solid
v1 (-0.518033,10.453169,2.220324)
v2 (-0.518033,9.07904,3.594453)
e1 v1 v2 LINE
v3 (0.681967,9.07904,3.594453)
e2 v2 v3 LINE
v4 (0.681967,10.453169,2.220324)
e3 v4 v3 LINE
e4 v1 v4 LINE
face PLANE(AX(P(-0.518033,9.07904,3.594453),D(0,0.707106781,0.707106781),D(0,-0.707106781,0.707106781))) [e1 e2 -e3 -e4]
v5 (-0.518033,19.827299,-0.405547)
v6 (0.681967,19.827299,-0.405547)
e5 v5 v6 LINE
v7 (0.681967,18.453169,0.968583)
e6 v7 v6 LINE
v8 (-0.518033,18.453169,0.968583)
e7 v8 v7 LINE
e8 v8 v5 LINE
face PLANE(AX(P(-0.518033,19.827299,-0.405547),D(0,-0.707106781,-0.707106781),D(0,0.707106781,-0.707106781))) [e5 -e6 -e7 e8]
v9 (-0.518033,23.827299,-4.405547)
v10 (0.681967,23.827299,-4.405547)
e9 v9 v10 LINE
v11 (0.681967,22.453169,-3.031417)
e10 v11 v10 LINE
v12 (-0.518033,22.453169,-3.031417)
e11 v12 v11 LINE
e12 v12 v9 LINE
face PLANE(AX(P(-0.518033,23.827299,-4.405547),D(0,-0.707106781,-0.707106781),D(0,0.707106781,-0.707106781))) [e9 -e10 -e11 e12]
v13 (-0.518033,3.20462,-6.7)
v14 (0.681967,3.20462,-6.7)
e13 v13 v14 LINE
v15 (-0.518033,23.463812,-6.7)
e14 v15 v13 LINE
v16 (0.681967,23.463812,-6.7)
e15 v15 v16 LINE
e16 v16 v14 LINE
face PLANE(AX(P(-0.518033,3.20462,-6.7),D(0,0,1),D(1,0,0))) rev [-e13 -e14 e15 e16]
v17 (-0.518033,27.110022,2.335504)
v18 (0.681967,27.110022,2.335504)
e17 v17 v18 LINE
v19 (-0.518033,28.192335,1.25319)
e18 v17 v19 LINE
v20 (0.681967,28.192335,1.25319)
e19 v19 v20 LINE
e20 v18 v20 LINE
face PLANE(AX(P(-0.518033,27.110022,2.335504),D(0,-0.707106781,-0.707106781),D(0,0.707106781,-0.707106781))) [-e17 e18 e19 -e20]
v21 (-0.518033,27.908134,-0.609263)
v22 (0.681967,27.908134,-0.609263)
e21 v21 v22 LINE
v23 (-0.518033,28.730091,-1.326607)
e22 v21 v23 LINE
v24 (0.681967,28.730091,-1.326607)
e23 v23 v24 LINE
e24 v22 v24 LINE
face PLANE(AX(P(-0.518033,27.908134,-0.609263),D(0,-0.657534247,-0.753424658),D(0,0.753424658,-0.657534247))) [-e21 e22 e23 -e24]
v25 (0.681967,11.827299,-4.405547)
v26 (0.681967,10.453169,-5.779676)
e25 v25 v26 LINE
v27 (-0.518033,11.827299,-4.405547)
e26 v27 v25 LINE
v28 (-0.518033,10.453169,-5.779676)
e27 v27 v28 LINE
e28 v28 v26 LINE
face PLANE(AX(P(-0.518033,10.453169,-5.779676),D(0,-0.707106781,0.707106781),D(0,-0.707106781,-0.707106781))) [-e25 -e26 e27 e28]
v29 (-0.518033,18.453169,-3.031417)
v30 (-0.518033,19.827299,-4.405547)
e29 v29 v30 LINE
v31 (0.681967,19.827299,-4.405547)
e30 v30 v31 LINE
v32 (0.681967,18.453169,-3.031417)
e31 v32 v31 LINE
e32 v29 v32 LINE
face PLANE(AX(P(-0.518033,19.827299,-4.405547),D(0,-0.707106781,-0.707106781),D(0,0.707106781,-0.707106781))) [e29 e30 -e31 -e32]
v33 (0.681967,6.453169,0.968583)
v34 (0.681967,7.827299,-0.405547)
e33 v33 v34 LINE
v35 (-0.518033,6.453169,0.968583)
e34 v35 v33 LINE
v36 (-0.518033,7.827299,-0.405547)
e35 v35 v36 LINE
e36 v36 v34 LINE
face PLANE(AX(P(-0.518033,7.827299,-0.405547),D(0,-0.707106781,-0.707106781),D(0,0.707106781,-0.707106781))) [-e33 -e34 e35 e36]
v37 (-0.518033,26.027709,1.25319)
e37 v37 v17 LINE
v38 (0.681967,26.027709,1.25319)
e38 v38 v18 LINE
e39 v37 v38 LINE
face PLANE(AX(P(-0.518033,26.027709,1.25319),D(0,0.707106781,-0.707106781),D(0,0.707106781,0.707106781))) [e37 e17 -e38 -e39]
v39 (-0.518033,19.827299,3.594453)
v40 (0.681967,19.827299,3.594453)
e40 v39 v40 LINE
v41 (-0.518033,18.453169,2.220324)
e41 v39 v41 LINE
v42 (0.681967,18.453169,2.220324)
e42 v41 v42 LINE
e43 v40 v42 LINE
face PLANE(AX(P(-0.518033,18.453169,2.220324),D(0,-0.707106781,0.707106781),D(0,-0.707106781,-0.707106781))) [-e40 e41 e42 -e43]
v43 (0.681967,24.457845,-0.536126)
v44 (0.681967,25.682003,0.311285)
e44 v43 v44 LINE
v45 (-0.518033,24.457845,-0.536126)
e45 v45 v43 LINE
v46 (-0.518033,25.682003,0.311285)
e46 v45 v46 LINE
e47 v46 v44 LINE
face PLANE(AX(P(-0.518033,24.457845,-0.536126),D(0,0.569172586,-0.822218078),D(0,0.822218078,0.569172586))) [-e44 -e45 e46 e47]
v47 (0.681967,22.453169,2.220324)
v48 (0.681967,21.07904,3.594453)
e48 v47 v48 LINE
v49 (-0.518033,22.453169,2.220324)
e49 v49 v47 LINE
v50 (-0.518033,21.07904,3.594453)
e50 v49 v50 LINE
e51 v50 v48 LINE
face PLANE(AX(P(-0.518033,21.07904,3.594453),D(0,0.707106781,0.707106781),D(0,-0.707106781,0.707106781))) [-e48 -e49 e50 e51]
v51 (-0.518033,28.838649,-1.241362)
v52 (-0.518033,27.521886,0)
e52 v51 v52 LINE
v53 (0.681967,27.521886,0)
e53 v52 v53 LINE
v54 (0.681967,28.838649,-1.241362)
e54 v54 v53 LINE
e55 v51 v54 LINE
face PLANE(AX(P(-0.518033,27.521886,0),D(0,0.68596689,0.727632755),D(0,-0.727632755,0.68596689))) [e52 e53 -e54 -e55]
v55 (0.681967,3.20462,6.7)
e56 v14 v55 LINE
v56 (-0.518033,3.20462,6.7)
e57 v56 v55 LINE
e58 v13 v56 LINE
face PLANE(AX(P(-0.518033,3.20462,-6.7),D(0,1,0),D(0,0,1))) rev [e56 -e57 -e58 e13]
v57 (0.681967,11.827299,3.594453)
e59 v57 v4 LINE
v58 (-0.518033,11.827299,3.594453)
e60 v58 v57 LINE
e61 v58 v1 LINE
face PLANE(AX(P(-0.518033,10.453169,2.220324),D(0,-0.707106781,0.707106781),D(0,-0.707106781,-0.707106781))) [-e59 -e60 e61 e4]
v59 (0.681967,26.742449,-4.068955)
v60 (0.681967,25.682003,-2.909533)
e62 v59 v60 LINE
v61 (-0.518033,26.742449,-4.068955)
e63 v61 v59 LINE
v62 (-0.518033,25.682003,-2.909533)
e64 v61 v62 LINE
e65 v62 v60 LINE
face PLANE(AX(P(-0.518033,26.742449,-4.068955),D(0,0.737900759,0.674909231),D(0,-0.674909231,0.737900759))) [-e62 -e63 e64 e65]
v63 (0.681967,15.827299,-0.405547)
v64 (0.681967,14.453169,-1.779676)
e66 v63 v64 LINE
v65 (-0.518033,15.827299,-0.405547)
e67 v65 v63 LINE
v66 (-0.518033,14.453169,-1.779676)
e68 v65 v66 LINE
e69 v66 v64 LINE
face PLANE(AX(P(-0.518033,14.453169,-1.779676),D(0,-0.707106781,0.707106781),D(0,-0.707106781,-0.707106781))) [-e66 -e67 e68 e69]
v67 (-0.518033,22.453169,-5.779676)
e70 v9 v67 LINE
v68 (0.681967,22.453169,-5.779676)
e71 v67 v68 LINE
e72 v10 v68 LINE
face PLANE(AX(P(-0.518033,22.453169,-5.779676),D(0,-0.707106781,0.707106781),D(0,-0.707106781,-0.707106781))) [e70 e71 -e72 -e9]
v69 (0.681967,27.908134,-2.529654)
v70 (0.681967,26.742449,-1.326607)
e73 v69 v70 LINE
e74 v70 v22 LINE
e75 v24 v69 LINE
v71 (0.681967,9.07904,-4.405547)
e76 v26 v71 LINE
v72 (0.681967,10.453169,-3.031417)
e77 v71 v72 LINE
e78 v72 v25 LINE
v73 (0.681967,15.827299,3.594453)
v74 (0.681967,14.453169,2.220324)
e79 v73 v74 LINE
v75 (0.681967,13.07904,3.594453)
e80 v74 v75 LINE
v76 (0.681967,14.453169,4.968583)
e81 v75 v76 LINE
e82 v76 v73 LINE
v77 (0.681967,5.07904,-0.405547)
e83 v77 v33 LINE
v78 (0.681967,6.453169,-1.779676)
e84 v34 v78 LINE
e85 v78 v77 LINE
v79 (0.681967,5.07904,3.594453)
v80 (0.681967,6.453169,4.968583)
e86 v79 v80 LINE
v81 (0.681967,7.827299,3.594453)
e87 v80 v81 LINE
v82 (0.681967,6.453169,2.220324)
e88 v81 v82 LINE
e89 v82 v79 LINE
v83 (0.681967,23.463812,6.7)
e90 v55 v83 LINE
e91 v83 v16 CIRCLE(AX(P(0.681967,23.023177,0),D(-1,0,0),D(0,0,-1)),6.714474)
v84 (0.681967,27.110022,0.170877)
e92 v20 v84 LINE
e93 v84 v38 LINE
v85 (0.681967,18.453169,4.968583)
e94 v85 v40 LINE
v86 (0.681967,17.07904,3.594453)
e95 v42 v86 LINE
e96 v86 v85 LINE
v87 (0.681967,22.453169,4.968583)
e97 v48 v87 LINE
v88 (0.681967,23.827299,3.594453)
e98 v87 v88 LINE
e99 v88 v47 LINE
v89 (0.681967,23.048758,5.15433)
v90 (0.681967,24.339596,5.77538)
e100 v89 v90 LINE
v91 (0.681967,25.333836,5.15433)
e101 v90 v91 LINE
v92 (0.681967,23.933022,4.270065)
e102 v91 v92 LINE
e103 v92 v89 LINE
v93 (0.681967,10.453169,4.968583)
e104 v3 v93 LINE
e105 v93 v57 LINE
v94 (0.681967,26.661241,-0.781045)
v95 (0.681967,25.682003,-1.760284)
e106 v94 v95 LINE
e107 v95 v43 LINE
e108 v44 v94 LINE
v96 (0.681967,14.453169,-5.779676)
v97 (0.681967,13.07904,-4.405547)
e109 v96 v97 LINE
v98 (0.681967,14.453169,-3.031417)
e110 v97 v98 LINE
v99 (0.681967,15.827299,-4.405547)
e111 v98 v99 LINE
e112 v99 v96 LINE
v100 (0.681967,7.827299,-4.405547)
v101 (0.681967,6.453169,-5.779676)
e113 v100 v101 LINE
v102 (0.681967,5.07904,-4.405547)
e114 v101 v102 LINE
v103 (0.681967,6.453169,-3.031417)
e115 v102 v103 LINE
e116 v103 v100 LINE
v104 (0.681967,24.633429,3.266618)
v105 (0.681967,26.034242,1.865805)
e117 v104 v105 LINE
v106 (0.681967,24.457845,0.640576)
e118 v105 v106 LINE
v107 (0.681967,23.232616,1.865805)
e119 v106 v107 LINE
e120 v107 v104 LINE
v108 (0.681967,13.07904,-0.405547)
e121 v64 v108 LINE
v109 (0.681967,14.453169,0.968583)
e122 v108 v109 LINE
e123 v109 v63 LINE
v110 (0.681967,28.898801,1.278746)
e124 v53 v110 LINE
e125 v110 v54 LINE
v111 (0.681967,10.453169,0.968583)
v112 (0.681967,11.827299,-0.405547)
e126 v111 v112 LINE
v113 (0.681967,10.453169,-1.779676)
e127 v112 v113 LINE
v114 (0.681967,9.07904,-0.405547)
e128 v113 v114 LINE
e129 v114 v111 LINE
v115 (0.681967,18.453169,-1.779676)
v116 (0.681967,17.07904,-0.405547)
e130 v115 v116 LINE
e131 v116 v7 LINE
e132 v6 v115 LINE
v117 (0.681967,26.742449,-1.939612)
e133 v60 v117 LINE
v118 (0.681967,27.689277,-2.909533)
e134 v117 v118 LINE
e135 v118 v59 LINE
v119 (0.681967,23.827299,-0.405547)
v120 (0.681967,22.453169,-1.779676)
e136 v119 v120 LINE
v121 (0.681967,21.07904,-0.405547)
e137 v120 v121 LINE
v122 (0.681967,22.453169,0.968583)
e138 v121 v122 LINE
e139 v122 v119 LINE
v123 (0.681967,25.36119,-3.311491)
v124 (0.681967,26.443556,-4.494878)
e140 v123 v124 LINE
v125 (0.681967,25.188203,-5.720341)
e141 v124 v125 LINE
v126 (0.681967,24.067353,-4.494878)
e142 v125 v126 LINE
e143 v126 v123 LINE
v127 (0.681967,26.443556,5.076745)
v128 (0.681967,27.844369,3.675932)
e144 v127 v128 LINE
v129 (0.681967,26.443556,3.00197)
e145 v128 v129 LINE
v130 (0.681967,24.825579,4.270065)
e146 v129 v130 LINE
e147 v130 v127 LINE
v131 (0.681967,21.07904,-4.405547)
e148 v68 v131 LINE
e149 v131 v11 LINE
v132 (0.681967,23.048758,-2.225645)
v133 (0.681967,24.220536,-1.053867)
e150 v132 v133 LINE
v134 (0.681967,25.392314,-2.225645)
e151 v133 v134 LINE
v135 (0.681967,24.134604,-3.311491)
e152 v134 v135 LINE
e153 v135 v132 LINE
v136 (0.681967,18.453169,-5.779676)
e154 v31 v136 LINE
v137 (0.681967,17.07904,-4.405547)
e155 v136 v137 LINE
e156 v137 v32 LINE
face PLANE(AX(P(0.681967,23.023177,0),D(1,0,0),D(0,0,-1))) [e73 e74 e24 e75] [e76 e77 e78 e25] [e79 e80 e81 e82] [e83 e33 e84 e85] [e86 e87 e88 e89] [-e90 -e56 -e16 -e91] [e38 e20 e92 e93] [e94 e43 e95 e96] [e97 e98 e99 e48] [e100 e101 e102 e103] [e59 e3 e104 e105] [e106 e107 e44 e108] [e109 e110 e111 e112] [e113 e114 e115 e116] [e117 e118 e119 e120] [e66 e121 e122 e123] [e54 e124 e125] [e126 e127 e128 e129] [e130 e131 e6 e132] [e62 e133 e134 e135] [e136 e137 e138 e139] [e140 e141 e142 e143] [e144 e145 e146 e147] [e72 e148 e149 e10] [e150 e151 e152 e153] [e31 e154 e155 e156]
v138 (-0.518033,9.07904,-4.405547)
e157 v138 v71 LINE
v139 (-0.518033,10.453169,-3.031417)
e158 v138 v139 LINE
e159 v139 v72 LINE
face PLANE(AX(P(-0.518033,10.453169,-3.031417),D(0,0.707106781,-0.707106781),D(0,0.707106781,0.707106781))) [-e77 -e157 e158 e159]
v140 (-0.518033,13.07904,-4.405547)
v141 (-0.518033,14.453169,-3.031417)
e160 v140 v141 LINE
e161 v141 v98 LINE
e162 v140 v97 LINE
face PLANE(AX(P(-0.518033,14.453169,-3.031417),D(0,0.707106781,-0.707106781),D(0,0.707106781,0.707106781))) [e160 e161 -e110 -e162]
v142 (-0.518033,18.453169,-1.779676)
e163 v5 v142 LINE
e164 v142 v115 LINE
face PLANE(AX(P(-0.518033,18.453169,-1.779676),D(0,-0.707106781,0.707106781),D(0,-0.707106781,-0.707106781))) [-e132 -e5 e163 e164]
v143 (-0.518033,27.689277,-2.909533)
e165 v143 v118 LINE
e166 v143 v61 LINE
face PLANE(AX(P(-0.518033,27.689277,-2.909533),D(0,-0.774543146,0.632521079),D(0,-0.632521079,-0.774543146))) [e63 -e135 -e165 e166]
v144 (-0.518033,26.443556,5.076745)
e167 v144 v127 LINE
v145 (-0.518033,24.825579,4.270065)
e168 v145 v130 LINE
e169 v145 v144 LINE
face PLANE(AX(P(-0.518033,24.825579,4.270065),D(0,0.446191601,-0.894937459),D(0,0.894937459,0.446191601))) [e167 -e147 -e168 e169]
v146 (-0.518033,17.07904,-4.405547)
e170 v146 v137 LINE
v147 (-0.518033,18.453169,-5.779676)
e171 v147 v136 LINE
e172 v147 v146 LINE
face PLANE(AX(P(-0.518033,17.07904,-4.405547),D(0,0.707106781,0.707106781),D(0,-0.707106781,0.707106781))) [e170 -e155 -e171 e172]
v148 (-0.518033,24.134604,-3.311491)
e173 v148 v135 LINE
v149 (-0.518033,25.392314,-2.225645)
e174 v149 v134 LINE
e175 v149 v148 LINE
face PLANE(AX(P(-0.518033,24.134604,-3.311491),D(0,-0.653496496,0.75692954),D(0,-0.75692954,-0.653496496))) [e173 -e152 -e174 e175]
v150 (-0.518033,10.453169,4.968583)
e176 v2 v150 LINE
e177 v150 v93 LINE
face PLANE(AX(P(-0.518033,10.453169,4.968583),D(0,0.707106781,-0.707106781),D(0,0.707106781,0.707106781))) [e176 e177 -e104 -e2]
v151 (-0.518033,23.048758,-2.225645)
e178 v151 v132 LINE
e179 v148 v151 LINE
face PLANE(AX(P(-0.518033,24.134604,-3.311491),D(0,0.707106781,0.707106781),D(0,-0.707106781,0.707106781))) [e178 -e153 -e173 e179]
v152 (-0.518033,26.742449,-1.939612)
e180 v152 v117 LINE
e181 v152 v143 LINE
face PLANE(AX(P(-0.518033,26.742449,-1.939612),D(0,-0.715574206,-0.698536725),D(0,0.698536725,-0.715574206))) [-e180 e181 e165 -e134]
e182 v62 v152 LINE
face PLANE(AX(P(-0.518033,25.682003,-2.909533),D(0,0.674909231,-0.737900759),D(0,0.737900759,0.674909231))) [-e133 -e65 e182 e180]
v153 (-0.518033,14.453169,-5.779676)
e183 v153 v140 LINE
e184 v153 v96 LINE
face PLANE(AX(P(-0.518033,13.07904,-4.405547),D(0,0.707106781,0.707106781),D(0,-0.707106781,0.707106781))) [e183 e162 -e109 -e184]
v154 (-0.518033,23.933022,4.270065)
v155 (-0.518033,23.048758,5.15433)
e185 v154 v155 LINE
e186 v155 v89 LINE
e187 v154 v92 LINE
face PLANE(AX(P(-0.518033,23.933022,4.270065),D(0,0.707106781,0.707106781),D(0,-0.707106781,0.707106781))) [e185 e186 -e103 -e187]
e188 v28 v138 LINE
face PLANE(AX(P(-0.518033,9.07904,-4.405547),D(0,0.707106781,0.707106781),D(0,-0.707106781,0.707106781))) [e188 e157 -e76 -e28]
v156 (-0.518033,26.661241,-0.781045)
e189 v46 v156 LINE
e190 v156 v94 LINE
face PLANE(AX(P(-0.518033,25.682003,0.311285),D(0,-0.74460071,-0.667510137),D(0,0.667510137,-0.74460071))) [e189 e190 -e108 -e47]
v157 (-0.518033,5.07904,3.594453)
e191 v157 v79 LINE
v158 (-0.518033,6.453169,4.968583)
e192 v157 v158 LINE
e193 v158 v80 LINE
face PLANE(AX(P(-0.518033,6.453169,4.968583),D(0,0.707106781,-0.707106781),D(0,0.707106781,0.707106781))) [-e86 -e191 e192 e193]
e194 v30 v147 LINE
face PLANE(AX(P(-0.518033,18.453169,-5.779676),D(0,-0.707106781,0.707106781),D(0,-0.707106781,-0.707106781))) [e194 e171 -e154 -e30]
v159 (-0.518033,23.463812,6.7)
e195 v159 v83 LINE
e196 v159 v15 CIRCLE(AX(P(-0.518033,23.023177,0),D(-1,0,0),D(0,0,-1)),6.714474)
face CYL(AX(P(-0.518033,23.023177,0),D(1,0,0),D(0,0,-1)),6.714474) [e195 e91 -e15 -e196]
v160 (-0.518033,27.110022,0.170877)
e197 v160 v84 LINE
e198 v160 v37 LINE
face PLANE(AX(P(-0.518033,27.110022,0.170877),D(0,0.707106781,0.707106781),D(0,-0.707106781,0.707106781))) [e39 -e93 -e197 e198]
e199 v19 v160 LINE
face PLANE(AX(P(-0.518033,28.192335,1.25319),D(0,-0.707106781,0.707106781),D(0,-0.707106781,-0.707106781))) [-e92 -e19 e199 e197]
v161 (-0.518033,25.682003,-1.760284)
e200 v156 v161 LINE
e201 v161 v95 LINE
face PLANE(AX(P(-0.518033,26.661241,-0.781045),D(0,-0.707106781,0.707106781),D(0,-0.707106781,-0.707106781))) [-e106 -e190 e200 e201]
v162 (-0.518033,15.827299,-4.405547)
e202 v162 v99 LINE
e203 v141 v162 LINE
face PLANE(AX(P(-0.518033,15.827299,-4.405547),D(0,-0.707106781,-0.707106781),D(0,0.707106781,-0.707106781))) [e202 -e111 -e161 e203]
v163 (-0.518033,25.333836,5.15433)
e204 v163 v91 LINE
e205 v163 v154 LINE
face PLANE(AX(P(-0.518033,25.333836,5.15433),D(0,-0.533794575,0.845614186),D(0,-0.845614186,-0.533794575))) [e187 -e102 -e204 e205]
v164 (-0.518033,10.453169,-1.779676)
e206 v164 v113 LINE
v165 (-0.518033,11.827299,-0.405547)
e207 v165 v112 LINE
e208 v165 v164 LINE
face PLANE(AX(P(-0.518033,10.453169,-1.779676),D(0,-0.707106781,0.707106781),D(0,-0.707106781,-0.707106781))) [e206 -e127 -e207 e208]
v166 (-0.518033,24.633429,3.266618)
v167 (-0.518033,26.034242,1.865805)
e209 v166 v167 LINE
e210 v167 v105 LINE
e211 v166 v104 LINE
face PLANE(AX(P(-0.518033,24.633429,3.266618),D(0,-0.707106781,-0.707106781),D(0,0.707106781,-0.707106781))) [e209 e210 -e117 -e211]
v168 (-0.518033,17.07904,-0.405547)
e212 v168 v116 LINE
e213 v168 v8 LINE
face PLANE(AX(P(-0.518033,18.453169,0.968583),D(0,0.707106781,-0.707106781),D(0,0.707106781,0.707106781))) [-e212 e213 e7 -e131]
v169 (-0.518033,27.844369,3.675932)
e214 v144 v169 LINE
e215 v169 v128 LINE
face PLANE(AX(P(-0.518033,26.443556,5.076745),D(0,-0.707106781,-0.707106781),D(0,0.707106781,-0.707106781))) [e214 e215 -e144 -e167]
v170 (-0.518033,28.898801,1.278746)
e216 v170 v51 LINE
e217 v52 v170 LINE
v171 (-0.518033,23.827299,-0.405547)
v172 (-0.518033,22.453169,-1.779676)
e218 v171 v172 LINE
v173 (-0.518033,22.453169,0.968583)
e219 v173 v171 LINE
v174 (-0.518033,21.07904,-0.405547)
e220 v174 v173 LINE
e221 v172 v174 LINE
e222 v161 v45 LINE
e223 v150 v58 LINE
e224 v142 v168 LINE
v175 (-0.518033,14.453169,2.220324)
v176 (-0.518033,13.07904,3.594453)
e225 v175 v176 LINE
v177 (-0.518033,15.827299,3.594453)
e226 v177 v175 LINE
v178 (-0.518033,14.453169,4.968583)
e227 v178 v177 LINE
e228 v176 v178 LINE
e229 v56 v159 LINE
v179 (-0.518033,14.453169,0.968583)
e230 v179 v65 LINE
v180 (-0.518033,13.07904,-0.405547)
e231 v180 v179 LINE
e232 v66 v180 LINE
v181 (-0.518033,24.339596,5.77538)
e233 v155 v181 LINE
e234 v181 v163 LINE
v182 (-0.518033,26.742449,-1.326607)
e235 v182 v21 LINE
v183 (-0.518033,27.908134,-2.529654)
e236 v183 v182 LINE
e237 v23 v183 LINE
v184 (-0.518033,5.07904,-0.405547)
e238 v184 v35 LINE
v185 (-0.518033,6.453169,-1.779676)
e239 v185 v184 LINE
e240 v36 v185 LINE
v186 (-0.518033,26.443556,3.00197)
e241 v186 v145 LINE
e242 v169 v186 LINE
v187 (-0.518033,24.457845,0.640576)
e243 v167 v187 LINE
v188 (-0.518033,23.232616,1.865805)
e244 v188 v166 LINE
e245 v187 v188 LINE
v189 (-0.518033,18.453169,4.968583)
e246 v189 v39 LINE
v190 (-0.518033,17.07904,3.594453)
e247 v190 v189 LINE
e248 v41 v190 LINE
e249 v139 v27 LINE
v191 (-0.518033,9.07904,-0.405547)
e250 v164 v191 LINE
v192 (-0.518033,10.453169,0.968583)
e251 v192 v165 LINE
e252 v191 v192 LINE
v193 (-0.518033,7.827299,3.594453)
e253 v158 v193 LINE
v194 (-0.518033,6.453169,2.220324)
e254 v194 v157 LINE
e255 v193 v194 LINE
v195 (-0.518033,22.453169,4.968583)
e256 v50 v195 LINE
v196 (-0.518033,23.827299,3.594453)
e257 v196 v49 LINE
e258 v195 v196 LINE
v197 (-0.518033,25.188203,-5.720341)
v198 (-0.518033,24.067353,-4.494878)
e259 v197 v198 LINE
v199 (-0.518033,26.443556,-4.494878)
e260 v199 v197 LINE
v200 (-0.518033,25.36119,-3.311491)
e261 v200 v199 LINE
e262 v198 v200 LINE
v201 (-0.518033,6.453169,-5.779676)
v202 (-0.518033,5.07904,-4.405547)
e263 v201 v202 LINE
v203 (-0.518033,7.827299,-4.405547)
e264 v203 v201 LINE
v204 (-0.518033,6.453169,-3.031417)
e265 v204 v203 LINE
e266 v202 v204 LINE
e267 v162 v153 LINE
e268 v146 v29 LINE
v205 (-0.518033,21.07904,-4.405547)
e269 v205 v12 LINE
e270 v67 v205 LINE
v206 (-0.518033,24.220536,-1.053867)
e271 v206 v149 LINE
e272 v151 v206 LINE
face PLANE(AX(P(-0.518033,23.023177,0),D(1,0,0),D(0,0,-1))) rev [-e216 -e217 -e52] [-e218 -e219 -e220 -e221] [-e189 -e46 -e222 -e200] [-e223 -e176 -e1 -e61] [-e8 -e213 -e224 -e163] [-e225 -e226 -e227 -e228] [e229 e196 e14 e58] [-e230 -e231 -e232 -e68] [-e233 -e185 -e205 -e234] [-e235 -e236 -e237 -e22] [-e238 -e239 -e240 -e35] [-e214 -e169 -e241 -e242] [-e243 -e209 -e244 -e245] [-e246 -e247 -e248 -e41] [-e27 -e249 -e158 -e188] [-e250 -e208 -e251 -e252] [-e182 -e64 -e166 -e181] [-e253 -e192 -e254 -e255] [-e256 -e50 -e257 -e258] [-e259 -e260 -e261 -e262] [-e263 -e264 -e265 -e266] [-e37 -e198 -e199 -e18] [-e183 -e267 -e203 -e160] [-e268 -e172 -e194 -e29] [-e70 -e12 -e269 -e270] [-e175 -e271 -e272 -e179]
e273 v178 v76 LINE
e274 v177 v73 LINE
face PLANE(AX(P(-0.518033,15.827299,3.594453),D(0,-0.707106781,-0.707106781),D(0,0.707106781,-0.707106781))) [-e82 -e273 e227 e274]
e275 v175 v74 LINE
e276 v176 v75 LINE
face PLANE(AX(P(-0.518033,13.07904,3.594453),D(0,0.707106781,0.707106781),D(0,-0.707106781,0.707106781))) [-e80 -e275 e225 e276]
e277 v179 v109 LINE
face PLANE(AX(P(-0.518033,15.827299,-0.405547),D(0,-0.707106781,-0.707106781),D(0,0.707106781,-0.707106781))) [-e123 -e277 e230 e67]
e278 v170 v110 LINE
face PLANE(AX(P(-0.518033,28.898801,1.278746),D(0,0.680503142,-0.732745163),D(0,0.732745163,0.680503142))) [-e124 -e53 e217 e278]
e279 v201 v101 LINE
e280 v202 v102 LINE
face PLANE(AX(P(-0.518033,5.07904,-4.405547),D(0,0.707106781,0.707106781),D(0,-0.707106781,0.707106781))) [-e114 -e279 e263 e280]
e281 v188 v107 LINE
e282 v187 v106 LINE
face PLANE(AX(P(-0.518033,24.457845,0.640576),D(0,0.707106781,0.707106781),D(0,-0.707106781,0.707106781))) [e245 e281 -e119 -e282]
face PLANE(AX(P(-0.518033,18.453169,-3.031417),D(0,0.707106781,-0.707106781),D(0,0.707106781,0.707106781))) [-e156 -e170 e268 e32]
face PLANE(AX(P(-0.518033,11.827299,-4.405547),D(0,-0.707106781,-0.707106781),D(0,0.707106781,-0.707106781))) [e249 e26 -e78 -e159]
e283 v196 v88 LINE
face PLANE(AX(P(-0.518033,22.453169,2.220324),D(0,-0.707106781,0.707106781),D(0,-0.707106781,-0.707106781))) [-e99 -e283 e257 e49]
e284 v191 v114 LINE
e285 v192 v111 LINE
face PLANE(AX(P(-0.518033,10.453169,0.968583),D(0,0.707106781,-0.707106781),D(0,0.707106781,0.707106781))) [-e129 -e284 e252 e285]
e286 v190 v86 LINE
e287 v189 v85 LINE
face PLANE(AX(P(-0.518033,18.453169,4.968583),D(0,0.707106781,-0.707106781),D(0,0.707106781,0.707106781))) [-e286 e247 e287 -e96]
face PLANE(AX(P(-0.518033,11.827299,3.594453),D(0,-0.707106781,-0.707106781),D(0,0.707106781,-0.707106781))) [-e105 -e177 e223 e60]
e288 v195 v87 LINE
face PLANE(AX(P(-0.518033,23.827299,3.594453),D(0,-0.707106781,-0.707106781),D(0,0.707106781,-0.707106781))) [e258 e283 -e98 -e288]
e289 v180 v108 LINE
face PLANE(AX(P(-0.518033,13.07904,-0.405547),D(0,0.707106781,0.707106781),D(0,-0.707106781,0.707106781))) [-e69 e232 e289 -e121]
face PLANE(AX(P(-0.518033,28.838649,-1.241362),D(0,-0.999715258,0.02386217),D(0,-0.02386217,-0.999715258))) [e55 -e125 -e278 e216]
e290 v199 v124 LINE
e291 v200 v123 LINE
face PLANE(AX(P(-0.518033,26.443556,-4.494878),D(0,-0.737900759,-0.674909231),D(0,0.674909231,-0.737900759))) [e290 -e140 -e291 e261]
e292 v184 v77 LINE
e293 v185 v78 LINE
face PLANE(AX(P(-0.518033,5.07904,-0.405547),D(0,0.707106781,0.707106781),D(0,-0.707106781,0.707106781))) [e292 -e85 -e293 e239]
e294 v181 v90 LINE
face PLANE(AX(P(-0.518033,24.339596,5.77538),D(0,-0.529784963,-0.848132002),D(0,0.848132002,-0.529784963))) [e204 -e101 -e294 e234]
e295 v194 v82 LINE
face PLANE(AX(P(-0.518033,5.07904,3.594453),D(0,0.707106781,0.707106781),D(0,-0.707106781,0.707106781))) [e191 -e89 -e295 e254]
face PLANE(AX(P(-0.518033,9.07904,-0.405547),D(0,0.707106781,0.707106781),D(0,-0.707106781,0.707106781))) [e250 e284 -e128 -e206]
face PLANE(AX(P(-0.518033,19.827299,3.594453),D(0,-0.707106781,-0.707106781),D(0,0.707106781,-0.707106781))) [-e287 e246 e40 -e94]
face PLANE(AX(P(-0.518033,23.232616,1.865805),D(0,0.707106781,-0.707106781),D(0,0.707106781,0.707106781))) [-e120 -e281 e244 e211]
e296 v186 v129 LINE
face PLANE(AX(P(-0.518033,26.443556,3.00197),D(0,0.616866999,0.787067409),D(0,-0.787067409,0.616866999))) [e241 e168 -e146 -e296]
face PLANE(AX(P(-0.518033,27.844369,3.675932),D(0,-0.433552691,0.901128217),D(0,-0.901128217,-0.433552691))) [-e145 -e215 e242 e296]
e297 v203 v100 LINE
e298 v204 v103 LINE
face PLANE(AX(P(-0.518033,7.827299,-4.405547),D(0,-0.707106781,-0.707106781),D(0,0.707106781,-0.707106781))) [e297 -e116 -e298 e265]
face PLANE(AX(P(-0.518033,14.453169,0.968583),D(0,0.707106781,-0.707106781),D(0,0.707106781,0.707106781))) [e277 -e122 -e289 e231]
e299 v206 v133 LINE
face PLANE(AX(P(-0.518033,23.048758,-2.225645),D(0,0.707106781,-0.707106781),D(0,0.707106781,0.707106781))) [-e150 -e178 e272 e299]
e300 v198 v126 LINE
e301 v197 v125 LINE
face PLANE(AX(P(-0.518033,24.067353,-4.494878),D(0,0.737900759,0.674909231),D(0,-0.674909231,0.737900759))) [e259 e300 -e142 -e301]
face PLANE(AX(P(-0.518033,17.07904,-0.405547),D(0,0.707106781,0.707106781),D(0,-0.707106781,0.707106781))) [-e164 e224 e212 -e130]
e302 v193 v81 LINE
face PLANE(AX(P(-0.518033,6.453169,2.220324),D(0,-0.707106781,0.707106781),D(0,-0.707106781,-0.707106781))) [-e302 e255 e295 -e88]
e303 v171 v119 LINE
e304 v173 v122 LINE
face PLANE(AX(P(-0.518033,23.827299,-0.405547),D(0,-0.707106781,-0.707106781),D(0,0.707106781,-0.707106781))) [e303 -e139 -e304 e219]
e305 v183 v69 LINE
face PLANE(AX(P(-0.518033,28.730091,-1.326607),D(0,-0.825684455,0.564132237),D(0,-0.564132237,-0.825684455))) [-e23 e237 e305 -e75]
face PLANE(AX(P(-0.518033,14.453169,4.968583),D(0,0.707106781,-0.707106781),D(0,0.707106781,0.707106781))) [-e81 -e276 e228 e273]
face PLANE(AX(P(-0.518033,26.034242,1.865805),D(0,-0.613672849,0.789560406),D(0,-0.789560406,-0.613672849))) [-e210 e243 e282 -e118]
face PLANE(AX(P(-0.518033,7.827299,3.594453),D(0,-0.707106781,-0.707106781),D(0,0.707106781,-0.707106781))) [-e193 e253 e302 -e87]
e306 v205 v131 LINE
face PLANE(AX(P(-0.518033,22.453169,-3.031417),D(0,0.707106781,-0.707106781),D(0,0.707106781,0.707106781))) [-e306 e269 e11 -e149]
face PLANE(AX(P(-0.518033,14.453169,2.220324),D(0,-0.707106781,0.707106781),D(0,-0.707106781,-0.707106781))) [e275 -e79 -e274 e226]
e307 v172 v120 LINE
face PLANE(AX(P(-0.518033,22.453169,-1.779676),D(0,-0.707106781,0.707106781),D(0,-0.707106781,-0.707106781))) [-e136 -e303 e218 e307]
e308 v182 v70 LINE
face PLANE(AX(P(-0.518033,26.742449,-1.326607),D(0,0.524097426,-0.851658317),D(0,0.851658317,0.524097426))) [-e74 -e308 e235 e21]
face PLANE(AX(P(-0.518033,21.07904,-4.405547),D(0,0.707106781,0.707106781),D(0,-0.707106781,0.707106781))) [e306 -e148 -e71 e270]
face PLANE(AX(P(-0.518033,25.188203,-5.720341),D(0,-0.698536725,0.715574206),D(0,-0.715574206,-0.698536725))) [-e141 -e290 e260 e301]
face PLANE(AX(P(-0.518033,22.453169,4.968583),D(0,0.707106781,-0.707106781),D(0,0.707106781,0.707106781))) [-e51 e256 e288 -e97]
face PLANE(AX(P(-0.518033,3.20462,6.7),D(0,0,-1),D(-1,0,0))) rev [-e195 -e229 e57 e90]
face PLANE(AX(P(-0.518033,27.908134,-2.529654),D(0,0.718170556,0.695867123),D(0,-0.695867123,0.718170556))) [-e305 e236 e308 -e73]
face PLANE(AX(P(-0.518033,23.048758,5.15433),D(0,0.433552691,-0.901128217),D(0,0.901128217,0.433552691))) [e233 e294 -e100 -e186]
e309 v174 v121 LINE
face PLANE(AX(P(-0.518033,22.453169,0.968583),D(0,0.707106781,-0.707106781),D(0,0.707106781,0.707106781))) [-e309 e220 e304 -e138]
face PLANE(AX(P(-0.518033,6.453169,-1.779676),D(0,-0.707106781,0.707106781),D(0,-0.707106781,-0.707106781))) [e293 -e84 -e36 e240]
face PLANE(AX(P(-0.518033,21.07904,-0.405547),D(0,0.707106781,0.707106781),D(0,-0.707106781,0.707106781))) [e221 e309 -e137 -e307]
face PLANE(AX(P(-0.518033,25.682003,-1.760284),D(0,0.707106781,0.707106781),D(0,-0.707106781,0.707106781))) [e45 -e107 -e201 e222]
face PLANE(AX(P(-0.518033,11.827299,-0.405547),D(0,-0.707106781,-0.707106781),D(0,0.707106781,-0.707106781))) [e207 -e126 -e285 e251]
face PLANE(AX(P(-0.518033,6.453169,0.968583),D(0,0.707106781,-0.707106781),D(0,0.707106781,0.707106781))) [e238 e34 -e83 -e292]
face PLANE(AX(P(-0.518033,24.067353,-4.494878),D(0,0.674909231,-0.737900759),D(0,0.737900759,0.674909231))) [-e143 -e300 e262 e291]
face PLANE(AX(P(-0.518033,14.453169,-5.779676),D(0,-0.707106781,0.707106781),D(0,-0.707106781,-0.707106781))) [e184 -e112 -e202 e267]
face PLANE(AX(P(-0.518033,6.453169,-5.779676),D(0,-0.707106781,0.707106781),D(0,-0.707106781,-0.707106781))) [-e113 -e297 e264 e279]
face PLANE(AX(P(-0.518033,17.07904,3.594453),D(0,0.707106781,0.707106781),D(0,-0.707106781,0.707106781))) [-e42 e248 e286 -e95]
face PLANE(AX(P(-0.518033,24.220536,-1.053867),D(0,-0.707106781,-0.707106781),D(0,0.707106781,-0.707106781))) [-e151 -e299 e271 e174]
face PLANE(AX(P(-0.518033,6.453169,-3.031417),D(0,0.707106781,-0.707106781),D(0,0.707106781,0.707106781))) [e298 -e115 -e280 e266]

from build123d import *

# Parameters (mm, degrees)
MAINBASESKETCH_W                 = 7.9
MAINBASESKETCH_H                 = 3.2
MAINBASEEXTRUDE_DEPTH            = 7.9
MAINBASESHELL_T                  = -1.2
SLIMYELLOWUNDEREXT_START         = -0.2
SLIMYELLOWUNDEREXT_DEPTH         = 2
SLIMYELLLOWUPPERCIRCLESKETCH_R   = 2.45
SLIMYELLLOWUPPERCIRCLESKETCH_R_2 = 2
SLIMYELLOWUPPERCIRCLE_DEPTH      = 1.6
MOVE_START                       = 3.2
MOVE_FACE2_OUTLINE_W             = 7.9
MOVE_FACE2_OUTLINE_H             = 15.8
MOVE_FACE2_OUTLINE_R             = 2
MOVE_FACE2_DEPTH                 = 27.8
MOVE_START_2                     = 31
MOVE_FACE2_2_OUTLINE_R           = 2.45
MOVE_FACE2_2_OUTLINE_R_2         = 2
MOVE_FACE2_2_DEPTH               = 1.6
FILLET25_R                       = 7.6
FILLET26_R                       = 7.6
CUT_EXTRUDE55_DEPTH              = 35.461282763
CUT_EXTRUDE57_REACH              = 34.748
SKETCH160_R                      = 0.75
BOSS_EXTRUDE20_DEPTH             = 3.5
BOSS_EXTRUDE22_DEPTH             = 1.2
CUT_EXTRUDE58_DEPTH              = 35.461282763
CUT_EXTRUDE59_DEPTH              = 31.506685799
CUT_EXTRUDE61_DEPTH              = 31.506685799
LPATTERN5_COUNT                  = 5
LPATTERN5_PITCH                  = 4
LPATTERN5_COUNT_DIR2             = 3
LPATTERN5_PITCH_DIR2             = 4
CUT_EXTRUDE62_DEPTH              = 31.506685799


# Read off the part's stored shape, not the designer's step: Move Face2
with BuildPart() as part:
    # MainBaseSketch → MainBaseExtrude (new, symmetric)
    with BuildSketch(Plane.XY):
        with Locations((4.631967213, 1.6)):
            Rectangle(MAINBASESKETCH_W, MAINBASESKETCH_H)
    extrude(amount=MAINBASEEXTRUDE_DEPTH, both=True)

    # MainBaseShell
    mainbaseshell_openings = [part.faces().sort_by_distance(p)[0] for p in [
        (4.631967213, 0, 0),
    ]]
    offset(amount=MAINBASESHELL_T, openings=mainbaseshell_openings, kind=Kind.INTERSECTION)

    # SlimYellowUnderExtSketch → SlimYellowUnderExt (add)
    with BuildSketch(Plane.XZ.offset(-2).offset(SLIMYELLOWUNDEREXT_START)):
        Polygon((1.881967213, 1.952811318), (1.881967213, 2.947188682), (2.384104441, 2.947188682), (2.882626102, 2.45), (2.384104441, 1.952811318), align=None)
        Polygon((6.381308324, 2.45), (6.879829986, 2.947188682), (7.381967213, 2.947188682), (7.381967213, 1.952811318), (6.879829986, 1.952811318), align=None)
        Polygon((1.881967213, -1.952811318), (2.384104441, -1.952811318), (2.882626102, -2.45), (2.384104441, -2.947188682), (1.881967213, -2.947188682), align=None)
        Polygon((7.381967213, -1.952811318), (7.381967213, -2.947188682), (6.879829986, -2.947188682), (6.381308324, -2.45), (6.879829986, -1.952811318), align=None)
    extrude(amount=SLIMYELLOWUNDEREXT_DEPTH)

    # SlimYelllowUpperCircleSketch → SlimYellowUpperCircle (add)
    with BuildSketch(Plane(origin=(0, 3.2, 0), x_dir=(1, 0, 0), z_dir=(0, 1, 0))):
        with Locations((4.647335619, 0)):
            Circle(SLIMYELLLOWUPPERCIRCLESKETCH_R)
        with Locations(Location((4.647335619, 0, 0), (0, 0, 270))):
            Circle(SLIMYELLLOWUPPERCIRCLESKETCH_R_2, mode=Mode.SUBTRACT)
    extrude(amount=SLIMYELLOWUPPERCIRCLE_DEPTH)

    # Move Face2 outline → Move Face2 (add)
    with BuildSketch(Plane(origin=(0, 0, 0), x_dir=(1, 0, 0), z_dir=(0, 1, 0)).offset(MOVE_START)):
        with Locations((4.631967213, 0)):
            Rectangle(MOVE_FACE2_OUTLINE_W, MOVE_FACE2_OUTLINE_H)
        with Locations((4.647335619, 0)):
            Circle(MOVE_FACE2_OUTLINE_R, mode=Mode.SUBTRACT)
    extrude(amount=MOVE_FACE2_DEPTH)

    # Move Face2 2 outline → Move Face2 2 (add)
    with BuildSketch(Plane(origin=(0, 0, 0), x_dir=(1, 0, 0), z_dir=(0, 1, 0)).offset(MOVE_START_2)):
        with Locations((4.647335619, 0)):
            Circle(MOVE_FACE2_2_OUTLINE_R)
        with Locations((4.647335619, 0)):
            Circle(MOVE_FACE2_2_OUTLINE_R_2, mode=Mode.SUBTRACT)
    extrude(amount=MOVE_FACE2_2_DEPTH)

    # Fillet25
    # the kernel refuses this fillet: 7.6 mm, written as the material it takes off along each edge
    with BuildSketch(Plane(origin=(0.681967213, 31, 7.9), x_dir=(0, 0, -1), z_dir=(1, 0, 0))) as fillet25_piece_1_section:
        with BuildLine():
            CenterArc((FILLET25_R, -FILLET25_R), FILLET25_R, 90, 90)
            Line((0, -FILLET25_R), (-FILLET25_R * 0.02, -FILLET25_R))
            Line((-FILLET25_R * 0.02, -FILLET25_R), (-FILLET25_R * 0.02, FILLET25_R * 0.02))
            Line((-FILLET25_R * 0.02, FILLET25_R * 0.02), (FILLET25_R, FILLET25_R * 0.02))
            Line((FILLET25_R, FILLET25_R * 0.02), (FILLET25_R, 0))
        make_face()
    fillet25_piece_1 = extrude(amount=7.9, mode=Mode.PRIVATE)
    fillet25_piece_1 = fillet25_piece_1 - Plane(origin=(4.647335619, 29.251763141, 0), x_dir=(1, 0, 0), z_dir=(0, -1, 0)) * Cylinder(2.45, 47, mode=Mode.PRIVATE)
    add(fillet25_piece_1, mode=Mode.SUBTRACT)

    # Fillet26
    # the kernel refuses this fillet: 7.6 mm, written as the material it takes off along each edge
    with BuildSketch(Plane(origin=(27.581967213, 31, -7.9), x_dir=(0, 0, 1), z_dir=(-1, 0, 0))) as fillet26_piece_1_section:
        with BuildLine():
            CenterArc((FILLET26_R, -FILLET26_R), FILLET26_R, 90, 90)
            Line((0, -FILLET26_R), (0, 0))
            Line((0, 0), (FILLET26_R, 0))
        make_face()
    fillet26_piece_1 = extrude(amount=45.9, mode=Mode.PRIVATE)
    fillet26_piece_1 = fillet26_piece_1 - Plane(origin=(4.647335619, 29.29236393, 0), x_dir=(1, 0, 0), z_dir=(0, -1, 0)) * Cylinder(2.45, 123, mode=Mode.PRIVATE)
    add(fillet26_piece_1, mode=Mode.SUBTRACT)

    # Sketch159 → Cut-Extrude55 (cut, through all)
    with BuildSketch(Plane(origin=(8.581967213, 0, 0), x_dir=(0, 0, -1), z_dir=(1, 0, 0))):
        with BuildLine():
            Line((6.7, 3.204620212), (6.7, 23.463811934))
            ThreePointArc((6.7, 23.463811934), (0, 29.737650856), (-6.7, 23.463811934))
            Line((-6.7, 23.463811934), (-6.7, 3.204620212))
            Line((-6.7, 3.204620212), (6.7, 3.204620212))
        make_face()
    extrude(amount=-CUT_EXTRUDE55_DEPTH, mode=Mode.SUBTRACT)

    # Sketch160 → Cut-Extrude57 (cut, up to next)
    with BuildSketch(Plane(origin=(0, 2, 0), x_dir=(-1, 0, 0), z_dir=(0, -1, 0)), mode=Mode.PRIVATE) as cut_extrude57_sk1:
        with Locations(Location((-6.381967213, 0, 0), (0, 0, 180))):
            Circle(SKETCH160_R)
    cut_extrude57_tool1 = extrude(cut_extrude57_sk1.sketch, amount=-CUT_EXTRUDE57_REACH, mode=Mode.PRIVATE) & part.part
    # Sketch160 → Cut-Extrude57 (cut, up to next)
    with BuildSketch(Plane(origin=(0, 2, 0), x_dir=(-1, 0, 0), z_dir=(0, -1, 0)), mode=Mode.PRIVATE) as cut_extrude57_sk2:
        with Locations(Location((-2.881967213, 0, 0), (0, 0, 180))):
            Circle(SKETCH160_R)
    cut_extrude57_tool2 = extrude(cut_extrude57_sk2.sketch, amount=-CUT_EXTRUDE57_REACH, mode=Mode.PRIVATE) & part.part
    add(cut_extrude57_tool1.solids().sort_by_distance((6.381967, 2, 0))[0], mode=Mode.SUBTRACT)
    add(cut_extrude57_tool2.solids().sort_by_distance((2.881967, 2, 0))[0], mode=Mode.SUBTRACT)

    # Sketch161 → Boss-Extrude20 (add, symmetric)
    with BuildSketch(Plane(origin=(4.631967213, 0, 0), x_dir=(0, 0, -1), z_dir=(1, 0, 0))):
        with BuildLine():
            Line((2.455062292, 30.688052313), (2.455062292, 30.469179439))
            Line((2.455062292, 30.469179439), (2.455062292, 29.272723248))
            ThreePointArc((2.455062292, 29.272723248), (0, 29.737650856), (-2.455062292, 29.272723248))
            Line((-2.455062292, 29.272723248), (-2.455062292, 30.526922148))
            Line((-2.455062292, 30.526922148), (-2.455062292, 30.688052313))
            ThreePointArc((-2.455062292, 30.688052313), (0, 31.033009473), (2.455062292, 30.688052313))
        make_face()
    extrude(amount=BOSS_EXTRUDE20_DEPTH, both=True)

    # Sketch163 → Cut-Extrude58 (cut, through all)
    with BuildSketch(Plane.ZY.offset(-0.681967213)):
        with BuildLine():
            Line((-7.9, 23.4), (-7.9, 0))
            Line((-7.9, 0), (7.9, 0))
            Line((7.9, 0), (7.9, 23.4))
            ThreePointArc((7.9, 23.4), (6.393942446, 28.039773701), (2.45, 30.91049266))
            Line((2.45, 30.91049266), (2.514245173, 32.885555996))
            Line((2.514245173, 32.885555996), (-2.45, 32.885555996))
            Line((-2.45, 32.885555996), (-2.45, 30.91049266))
            ThreePointArc((-2.45, 30.91049266), (-6.393942446, 28.039773701), (-7.9, 23.4))
        make_face()
        with BuildLine():
            Line((6.7, 23.463811934), (6.7, 3.204620212))
            Line((6.7, 3.204620212), (-6.7, 3.204620212))
            Line((-6.7, 3.204620212), (-6.7, 23.463811934))
            ThreePointArc((-6.7, 23.463811934), (0, 29.737650856), (6.7, 23.463811934))
        make_face(mode=Mode.SUBTRACT)
    extrude(amount=-CUT_EXTRUDE58_DEPTH, mode=Mode.SUBTRACT)


with BuildPart() as body_2:
    # Sketch162 → Boss-Extrude22 (new body)
    with BuildSketch(Plane.ZY.offset(-0.681967213)):
        with BuildLine():
            Line((-6.7, 3.204620212), (-6.7, 23.463811934))
            ThreePointArc((-6.7, 23.463811934), (0, 29.737650856), (6.7, 23.463811934))
            Line((6.7, 23.463811934), (6.7, 3.204620212))
            Line((6.7, 3.204620212), (-6.7, 3.204620212))
        make_face()
    extrude(amount=BOSS_EXTRUDE22_DEPTH)

    # Sketch164 → Cut-Extrude59 (cut, through all)
    with BuildSketch(Plane.ZY.offset(-0.681967213)):
        Polygon((0, 27.521885921), (-1.241361972, 28.838648646), (1.278746144, 28.898801022), align=None)
    extrude(amount=CUT_EXTRUDE59_DEPTH, mode=Mode.SUBTRACT)

    # Sketch165 → Cut-Extrude61 (cut, through all)
    with BuildSketch(Plane.ZY.offset(-0.681967213)):
        Polygon((-4.405546645, 23.827298552), (-3.03141738, 22.453169286), (-4.405546645, 21.079040021), (-5.779675911, 22.453169286), align=None)
    cut_extrude61 = extrude(amount=CUT_EXTRUDE61_DEPTH, mode=Mode.SUBTRACT)

    # LPattern5: Cut-Extrude61 5 × 3
    with Locations(*[(0, -i * LPATTERN5_PITCH, j * LPATTERN5_PITCH_DIR2) for i in range(LPATTERN5_COUNT) for j in range(LPATTERN5_COUNT_DIR2) if (i, j) != (0, 0)]):
        add(cut_extrude61, mode=Mode.SUBTRACT)

    # Sketch166 → Cut-Extrude62 (cut, through all)
    with BuildSketch(Plane.ZY.offset(-0.681967213)):
        Polygon((-4.494877975, 24.067352963), (-5.720341085, 25.188203369), (-4.494877975, 26.443555824), (-3.311490851, 25.361189552), align=None)
        Polygon((-4.06895482, 26.742449265), (-2.909533146, 25.682002612), (-1.939612427, 26.742449265), (-2.909533146, 27.689276634), align=None)
        Polygon((-2.529653596, 27.908133687), (-1.326607494, 26.742449265), (-0.609263234, 27.908133687), (-1.326607494, 28.730090652), align=None)
        Polygon((-3.311490851, 24.134603988), (-2.225644972, 23.048758109), (-1.053867228, 24.220535852), (-2.225644972, 25.392313595), align=None)
        Polygon((-1.760283975, 25.682002612), (-0.536126237, 24.457844874), (0.311285226, 25.682002612), (-0.781045381, 26.661241207), align=None)
        Polygon((0.640575983, 24.457844874), (1.865804986, 23.232615872), (3.266618207, 24.633429093), (1.865804986, 26.034242315), align=None)
        Polygon((0.170877374, 27.11002176), (1.253190484, 26.027708649), (2.335503595, 27.11002176), (1.253190484, 28.19233487), align=None)
        Polygon((3.001969531, 26.443555824), (4.270065236, 24.825578524), (5.076744937, 26.443555824), (3.675931716, 27.844369045), align=None)
        Polygon((4.270065236, 23.933022483), (5.15432961, 23.048758109), (5.775380406, 24.339596358), (5.15432961, 25.333835704), align=None)
    extrude(amount=CUT_EXTRUDE62_DEPTH, mode=Mode.SUBTRACT)


solid = body_2.part
